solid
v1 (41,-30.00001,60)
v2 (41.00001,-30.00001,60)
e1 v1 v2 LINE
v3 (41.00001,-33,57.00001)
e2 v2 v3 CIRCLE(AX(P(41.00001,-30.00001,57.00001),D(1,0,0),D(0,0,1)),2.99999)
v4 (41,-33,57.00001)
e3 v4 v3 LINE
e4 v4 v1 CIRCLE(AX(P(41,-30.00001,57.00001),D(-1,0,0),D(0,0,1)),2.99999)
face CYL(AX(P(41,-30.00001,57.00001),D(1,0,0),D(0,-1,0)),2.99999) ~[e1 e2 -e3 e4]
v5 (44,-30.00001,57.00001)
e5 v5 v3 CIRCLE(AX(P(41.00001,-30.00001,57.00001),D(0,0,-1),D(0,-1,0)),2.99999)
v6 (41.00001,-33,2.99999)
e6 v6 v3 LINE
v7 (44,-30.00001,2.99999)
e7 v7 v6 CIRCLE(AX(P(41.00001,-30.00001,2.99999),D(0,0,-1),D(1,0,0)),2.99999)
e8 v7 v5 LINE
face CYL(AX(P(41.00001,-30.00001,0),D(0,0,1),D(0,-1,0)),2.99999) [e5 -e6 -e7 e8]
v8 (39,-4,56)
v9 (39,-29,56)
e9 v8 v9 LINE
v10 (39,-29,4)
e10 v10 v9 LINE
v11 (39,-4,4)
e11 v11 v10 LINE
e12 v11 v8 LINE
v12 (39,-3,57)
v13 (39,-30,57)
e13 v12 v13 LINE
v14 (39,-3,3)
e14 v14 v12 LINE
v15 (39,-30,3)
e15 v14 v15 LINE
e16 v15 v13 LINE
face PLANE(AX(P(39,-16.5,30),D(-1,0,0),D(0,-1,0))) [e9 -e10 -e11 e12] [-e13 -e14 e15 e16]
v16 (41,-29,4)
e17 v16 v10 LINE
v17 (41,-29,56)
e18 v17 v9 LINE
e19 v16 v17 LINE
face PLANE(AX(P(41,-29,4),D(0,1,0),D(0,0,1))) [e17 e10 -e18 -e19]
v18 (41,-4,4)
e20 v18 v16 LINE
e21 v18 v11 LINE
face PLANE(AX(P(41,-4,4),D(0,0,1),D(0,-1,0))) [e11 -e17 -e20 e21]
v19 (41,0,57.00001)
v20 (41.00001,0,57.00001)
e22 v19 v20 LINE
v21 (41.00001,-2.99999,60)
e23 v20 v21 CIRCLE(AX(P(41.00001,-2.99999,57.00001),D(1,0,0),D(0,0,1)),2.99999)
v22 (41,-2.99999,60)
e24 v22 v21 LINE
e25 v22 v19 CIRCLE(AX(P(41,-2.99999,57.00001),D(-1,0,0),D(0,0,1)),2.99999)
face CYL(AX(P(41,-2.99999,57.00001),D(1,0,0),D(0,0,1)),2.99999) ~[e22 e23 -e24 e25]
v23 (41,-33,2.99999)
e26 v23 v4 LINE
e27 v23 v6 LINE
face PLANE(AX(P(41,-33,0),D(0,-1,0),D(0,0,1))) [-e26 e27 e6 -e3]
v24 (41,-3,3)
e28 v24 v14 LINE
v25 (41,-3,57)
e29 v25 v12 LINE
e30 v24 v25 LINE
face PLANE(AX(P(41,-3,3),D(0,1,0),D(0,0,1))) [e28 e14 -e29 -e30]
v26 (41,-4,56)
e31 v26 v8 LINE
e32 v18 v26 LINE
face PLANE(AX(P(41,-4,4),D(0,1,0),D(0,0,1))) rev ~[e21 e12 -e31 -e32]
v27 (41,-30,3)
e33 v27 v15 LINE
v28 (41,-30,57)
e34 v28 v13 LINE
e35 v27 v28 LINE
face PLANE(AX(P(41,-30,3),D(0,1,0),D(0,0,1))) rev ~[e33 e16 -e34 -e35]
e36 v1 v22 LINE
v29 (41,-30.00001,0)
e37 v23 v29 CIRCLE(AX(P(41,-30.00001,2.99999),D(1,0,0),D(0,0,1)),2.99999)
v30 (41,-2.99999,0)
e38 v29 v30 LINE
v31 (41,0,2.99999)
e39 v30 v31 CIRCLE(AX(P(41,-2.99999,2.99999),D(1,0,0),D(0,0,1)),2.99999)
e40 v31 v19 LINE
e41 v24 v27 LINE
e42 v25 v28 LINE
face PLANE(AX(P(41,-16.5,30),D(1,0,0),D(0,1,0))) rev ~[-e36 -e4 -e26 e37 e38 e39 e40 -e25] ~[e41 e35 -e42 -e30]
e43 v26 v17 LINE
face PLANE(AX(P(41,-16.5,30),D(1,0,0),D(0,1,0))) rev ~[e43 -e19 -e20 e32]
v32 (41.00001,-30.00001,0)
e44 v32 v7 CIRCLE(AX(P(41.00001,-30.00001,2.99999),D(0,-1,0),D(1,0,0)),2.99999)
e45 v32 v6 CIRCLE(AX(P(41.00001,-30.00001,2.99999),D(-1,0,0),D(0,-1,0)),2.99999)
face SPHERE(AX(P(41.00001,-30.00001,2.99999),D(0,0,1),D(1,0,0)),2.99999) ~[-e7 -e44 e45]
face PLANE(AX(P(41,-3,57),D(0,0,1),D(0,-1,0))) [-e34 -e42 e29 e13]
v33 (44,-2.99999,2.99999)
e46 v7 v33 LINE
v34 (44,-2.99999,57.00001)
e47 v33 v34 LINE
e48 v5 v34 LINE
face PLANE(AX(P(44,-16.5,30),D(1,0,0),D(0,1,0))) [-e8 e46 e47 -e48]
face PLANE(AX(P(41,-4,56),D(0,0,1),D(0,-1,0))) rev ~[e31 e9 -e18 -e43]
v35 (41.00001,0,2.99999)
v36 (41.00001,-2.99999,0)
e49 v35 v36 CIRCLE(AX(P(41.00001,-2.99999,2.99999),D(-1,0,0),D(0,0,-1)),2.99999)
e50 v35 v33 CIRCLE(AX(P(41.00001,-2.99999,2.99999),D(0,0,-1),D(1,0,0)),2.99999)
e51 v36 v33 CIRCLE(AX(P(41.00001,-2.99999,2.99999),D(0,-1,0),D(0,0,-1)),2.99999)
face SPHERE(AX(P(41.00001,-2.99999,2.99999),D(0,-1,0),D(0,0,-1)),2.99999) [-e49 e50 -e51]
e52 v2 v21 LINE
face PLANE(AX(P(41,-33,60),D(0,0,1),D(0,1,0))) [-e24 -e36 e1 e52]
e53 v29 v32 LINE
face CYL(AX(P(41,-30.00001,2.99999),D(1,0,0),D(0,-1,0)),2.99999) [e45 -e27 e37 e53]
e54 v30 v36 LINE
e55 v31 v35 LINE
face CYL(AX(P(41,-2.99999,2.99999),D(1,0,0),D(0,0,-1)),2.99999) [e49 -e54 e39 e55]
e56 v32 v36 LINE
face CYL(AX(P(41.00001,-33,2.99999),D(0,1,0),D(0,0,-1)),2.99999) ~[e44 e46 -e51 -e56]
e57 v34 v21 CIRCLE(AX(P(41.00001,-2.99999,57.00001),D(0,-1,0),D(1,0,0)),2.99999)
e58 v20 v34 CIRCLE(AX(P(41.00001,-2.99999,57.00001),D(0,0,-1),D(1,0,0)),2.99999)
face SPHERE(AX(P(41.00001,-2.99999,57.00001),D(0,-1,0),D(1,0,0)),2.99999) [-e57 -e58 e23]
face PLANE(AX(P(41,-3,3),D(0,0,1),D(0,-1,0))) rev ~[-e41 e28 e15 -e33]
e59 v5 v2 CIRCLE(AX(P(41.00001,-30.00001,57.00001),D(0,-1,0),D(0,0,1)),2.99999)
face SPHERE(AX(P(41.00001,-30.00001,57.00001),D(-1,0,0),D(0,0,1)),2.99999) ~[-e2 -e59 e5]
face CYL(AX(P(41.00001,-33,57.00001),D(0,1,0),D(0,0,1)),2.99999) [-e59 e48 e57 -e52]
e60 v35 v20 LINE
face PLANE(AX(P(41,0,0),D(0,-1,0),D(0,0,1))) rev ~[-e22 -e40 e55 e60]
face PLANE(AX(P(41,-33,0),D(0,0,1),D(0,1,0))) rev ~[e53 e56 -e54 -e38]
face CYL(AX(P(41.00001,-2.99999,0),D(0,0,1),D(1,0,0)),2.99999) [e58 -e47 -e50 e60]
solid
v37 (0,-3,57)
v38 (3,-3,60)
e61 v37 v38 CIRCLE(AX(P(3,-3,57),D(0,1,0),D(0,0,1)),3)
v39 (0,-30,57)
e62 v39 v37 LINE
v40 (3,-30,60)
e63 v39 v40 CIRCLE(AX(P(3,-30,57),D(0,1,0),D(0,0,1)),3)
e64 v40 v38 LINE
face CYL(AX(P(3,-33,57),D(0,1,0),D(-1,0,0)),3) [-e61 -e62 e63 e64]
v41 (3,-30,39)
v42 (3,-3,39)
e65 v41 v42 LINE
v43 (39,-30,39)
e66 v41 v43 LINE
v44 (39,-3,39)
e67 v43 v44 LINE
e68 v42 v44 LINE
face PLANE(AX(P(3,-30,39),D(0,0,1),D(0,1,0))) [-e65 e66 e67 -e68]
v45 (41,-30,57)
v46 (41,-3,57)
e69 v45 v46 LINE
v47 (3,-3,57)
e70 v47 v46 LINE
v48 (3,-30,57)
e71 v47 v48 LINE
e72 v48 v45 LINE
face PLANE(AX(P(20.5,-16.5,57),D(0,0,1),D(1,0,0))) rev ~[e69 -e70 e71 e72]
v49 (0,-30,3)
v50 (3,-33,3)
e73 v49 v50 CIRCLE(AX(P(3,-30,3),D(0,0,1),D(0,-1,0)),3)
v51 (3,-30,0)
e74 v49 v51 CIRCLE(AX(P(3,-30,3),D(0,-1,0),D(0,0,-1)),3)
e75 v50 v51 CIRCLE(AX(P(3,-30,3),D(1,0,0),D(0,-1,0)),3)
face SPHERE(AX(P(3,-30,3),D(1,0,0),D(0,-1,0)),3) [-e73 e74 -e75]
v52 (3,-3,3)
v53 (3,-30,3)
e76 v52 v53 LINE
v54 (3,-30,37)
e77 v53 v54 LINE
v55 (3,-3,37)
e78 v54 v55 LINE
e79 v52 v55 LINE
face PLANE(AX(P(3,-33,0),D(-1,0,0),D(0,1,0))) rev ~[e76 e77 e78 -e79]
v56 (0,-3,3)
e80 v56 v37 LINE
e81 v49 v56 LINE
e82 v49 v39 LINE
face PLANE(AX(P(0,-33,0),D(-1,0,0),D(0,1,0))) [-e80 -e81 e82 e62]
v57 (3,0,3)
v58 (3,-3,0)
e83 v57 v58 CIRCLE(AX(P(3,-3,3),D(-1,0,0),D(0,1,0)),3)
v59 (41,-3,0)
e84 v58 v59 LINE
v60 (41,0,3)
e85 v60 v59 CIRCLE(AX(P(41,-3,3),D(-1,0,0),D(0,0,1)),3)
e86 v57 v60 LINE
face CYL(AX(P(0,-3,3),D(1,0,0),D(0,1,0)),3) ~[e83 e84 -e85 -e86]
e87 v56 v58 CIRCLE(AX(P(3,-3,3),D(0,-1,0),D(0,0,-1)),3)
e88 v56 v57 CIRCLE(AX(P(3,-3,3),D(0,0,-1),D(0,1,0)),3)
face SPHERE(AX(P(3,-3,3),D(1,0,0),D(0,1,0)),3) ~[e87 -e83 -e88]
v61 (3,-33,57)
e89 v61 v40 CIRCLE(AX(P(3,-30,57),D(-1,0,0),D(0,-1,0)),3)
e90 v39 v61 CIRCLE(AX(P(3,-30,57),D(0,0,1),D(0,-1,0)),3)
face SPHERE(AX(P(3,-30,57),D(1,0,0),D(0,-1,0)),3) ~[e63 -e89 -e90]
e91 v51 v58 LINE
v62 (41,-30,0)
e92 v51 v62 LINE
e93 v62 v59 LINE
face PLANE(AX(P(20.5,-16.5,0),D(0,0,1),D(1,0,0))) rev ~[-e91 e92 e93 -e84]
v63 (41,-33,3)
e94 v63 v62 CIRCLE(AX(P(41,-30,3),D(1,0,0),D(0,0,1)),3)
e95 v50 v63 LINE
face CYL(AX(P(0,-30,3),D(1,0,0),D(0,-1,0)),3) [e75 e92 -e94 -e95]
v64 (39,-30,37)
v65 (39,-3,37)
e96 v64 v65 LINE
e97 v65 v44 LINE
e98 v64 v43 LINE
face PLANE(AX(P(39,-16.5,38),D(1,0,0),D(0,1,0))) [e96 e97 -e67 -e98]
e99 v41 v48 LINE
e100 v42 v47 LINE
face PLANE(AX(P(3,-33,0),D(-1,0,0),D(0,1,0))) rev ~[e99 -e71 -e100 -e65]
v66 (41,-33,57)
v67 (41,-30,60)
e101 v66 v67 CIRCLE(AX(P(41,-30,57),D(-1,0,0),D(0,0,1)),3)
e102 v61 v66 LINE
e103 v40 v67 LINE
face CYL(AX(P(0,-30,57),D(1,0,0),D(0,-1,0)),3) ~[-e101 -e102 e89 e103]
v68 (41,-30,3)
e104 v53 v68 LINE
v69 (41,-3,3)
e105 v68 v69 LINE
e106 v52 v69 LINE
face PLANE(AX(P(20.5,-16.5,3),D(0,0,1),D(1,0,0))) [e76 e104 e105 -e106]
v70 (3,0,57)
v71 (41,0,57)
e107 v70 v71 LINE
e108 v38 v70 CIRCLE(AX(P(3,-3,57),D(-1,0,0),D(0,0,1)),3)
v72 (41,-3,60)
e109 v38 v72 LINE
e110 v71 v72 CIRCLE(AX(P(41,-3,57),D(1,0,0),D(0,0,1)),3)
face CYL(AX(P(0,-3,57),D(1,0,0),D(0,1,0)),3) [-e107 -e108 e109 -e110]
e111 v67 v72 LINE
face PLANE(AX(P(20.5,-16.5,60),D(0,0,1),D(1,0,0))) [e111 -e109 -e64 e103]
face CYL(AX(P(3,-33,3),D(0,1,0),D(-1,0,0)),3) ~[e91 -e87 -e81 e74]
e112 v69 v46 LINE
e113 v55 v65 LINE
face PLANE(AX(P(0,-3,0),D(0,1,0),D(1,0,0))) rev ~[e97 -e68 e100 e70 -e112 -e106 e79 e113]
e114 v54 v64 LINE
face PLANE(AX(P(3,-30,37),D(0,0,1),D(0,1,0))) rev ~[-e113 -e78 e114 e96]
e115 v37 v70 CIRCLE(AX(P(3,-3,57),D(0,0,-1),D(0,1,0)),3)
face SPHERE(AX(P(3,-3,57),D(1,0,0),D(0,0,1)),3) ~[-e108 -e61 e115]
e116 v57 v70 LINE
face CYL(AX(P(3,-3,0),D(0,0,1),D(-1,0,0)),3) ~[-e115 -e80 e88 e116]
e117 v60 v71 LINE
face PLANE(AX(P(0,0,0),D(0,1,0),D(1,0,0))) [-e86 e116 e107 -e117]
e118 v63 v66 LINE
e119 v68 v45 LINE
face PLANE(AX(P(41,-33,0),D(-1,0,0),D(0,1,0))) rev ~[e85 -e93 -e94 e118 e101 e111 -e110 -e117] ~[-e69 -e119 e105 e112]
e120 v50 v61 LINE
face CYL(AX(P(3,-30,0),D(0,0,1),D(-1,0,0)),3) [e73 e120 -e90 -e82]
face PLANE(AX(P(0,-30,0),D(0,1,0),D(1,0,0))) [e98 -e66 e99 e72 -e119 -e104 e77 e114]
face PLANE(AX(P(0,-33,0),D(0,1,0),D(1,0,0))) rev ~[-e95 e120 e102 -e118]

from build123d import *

# Parameters (mm, degrees)
F0_W     = 41
F0_H     = 33
F1_DEPTH = 60
F2_T     = -3
F3_W     = 27
F3_H     = 2
F4_DEPTH = 36
F5_W     = 33
F5_H     = 60
F6_DEPTH = 3
F7_W     = 27
F7_H     = 54
F7_W_2   = 25
F7_H_2   = 52
F8_DEPTH = 2
F9_R     = 3
F10_R    = 2.99999


# Not quite as in the source:
# - a fillet or chamfer is up to 0.001 mm smaller than in the source, because OpenCascade refuses the exact size


with BuildPart() as f1:
    # F0 (on Top) → F1 (new body)
    with BuildSketch(Plane.XY):
        with Locations((20.5, -16.5)):
            Rectangle(F0_W, F0_H)
    extrude(amount=F1_DEPTH)

    # F2
    f2_openings = [f1.faces().sort_by_distance(p)[0] for p in [
        (41, -16.5, 30),
    ]]
    offset(amount=F2_T, openings=f2_openings)

    # F3 (on face) → F4 (join)
    with BuildSketch(Plane.YZ.offset(3)):
        with Locations((-16.5, 38)):
            Rectangle(F3_W, F3_H)
    extrude(amount=F4_DEPTH)

    # F9
    f9_edges = [f1.edges().sort_by_distance(p)[0] for p in [
        (20.5, -33, 60),
        (20.5, 0, 60),
        (20.5, 0, 0),
        (20.5, -33, 0),
        (0, -33, 30),
        (0, -16.5, 60),
        (0, 0, 30),
        (0, -16.5, 0),
    ]]
    fillet(f9_edges, radius=F9_R)


with BuildPart() as f6:
    # F5 (on face) → F6 (new body)
    with BuildSketch(Plane.YZ.offset(41)):
        with Locations((-16.5, 30)):
            Rectangle(F5_W, F5_H)
    extrude(amount=F6_DEPTH)

    # F7 (on face) → F8 (join)
    with BuildSketch(Plane(origin=(41, 0, 0), x_dir=(0, -1, 0), z_dir=(-1, 0, 0))):
        with Locations((16.5, 30)):
            Rectangle(F7_W, F7_H)
        with Locations((16.5, 30)):
            Rectangle(F7_W_2, F7_H_2, mode=Mode.SUBTRACT)
    extrude(amount=F8_DEPTH)

    # F10 (radius 3 in the source; OpenCascade refuses exactly that, so slightly less here)
    f10_edges = [f6.edges().sort_by_distance(p)[0] for p in [
        (42.5, -33, 60),
        (44, -16.5, 60),
        (44, -33, 30),
        (44, -16.5, 0),
        (42.5, -33, 0),
        (42.5, 0, 0),
        (44, 0, 30),
        (42.5, 0, 60),
    ]]
    fillet(f10_edges, radius=F10_R)


solid = Compound([f1.part, f6.part])
